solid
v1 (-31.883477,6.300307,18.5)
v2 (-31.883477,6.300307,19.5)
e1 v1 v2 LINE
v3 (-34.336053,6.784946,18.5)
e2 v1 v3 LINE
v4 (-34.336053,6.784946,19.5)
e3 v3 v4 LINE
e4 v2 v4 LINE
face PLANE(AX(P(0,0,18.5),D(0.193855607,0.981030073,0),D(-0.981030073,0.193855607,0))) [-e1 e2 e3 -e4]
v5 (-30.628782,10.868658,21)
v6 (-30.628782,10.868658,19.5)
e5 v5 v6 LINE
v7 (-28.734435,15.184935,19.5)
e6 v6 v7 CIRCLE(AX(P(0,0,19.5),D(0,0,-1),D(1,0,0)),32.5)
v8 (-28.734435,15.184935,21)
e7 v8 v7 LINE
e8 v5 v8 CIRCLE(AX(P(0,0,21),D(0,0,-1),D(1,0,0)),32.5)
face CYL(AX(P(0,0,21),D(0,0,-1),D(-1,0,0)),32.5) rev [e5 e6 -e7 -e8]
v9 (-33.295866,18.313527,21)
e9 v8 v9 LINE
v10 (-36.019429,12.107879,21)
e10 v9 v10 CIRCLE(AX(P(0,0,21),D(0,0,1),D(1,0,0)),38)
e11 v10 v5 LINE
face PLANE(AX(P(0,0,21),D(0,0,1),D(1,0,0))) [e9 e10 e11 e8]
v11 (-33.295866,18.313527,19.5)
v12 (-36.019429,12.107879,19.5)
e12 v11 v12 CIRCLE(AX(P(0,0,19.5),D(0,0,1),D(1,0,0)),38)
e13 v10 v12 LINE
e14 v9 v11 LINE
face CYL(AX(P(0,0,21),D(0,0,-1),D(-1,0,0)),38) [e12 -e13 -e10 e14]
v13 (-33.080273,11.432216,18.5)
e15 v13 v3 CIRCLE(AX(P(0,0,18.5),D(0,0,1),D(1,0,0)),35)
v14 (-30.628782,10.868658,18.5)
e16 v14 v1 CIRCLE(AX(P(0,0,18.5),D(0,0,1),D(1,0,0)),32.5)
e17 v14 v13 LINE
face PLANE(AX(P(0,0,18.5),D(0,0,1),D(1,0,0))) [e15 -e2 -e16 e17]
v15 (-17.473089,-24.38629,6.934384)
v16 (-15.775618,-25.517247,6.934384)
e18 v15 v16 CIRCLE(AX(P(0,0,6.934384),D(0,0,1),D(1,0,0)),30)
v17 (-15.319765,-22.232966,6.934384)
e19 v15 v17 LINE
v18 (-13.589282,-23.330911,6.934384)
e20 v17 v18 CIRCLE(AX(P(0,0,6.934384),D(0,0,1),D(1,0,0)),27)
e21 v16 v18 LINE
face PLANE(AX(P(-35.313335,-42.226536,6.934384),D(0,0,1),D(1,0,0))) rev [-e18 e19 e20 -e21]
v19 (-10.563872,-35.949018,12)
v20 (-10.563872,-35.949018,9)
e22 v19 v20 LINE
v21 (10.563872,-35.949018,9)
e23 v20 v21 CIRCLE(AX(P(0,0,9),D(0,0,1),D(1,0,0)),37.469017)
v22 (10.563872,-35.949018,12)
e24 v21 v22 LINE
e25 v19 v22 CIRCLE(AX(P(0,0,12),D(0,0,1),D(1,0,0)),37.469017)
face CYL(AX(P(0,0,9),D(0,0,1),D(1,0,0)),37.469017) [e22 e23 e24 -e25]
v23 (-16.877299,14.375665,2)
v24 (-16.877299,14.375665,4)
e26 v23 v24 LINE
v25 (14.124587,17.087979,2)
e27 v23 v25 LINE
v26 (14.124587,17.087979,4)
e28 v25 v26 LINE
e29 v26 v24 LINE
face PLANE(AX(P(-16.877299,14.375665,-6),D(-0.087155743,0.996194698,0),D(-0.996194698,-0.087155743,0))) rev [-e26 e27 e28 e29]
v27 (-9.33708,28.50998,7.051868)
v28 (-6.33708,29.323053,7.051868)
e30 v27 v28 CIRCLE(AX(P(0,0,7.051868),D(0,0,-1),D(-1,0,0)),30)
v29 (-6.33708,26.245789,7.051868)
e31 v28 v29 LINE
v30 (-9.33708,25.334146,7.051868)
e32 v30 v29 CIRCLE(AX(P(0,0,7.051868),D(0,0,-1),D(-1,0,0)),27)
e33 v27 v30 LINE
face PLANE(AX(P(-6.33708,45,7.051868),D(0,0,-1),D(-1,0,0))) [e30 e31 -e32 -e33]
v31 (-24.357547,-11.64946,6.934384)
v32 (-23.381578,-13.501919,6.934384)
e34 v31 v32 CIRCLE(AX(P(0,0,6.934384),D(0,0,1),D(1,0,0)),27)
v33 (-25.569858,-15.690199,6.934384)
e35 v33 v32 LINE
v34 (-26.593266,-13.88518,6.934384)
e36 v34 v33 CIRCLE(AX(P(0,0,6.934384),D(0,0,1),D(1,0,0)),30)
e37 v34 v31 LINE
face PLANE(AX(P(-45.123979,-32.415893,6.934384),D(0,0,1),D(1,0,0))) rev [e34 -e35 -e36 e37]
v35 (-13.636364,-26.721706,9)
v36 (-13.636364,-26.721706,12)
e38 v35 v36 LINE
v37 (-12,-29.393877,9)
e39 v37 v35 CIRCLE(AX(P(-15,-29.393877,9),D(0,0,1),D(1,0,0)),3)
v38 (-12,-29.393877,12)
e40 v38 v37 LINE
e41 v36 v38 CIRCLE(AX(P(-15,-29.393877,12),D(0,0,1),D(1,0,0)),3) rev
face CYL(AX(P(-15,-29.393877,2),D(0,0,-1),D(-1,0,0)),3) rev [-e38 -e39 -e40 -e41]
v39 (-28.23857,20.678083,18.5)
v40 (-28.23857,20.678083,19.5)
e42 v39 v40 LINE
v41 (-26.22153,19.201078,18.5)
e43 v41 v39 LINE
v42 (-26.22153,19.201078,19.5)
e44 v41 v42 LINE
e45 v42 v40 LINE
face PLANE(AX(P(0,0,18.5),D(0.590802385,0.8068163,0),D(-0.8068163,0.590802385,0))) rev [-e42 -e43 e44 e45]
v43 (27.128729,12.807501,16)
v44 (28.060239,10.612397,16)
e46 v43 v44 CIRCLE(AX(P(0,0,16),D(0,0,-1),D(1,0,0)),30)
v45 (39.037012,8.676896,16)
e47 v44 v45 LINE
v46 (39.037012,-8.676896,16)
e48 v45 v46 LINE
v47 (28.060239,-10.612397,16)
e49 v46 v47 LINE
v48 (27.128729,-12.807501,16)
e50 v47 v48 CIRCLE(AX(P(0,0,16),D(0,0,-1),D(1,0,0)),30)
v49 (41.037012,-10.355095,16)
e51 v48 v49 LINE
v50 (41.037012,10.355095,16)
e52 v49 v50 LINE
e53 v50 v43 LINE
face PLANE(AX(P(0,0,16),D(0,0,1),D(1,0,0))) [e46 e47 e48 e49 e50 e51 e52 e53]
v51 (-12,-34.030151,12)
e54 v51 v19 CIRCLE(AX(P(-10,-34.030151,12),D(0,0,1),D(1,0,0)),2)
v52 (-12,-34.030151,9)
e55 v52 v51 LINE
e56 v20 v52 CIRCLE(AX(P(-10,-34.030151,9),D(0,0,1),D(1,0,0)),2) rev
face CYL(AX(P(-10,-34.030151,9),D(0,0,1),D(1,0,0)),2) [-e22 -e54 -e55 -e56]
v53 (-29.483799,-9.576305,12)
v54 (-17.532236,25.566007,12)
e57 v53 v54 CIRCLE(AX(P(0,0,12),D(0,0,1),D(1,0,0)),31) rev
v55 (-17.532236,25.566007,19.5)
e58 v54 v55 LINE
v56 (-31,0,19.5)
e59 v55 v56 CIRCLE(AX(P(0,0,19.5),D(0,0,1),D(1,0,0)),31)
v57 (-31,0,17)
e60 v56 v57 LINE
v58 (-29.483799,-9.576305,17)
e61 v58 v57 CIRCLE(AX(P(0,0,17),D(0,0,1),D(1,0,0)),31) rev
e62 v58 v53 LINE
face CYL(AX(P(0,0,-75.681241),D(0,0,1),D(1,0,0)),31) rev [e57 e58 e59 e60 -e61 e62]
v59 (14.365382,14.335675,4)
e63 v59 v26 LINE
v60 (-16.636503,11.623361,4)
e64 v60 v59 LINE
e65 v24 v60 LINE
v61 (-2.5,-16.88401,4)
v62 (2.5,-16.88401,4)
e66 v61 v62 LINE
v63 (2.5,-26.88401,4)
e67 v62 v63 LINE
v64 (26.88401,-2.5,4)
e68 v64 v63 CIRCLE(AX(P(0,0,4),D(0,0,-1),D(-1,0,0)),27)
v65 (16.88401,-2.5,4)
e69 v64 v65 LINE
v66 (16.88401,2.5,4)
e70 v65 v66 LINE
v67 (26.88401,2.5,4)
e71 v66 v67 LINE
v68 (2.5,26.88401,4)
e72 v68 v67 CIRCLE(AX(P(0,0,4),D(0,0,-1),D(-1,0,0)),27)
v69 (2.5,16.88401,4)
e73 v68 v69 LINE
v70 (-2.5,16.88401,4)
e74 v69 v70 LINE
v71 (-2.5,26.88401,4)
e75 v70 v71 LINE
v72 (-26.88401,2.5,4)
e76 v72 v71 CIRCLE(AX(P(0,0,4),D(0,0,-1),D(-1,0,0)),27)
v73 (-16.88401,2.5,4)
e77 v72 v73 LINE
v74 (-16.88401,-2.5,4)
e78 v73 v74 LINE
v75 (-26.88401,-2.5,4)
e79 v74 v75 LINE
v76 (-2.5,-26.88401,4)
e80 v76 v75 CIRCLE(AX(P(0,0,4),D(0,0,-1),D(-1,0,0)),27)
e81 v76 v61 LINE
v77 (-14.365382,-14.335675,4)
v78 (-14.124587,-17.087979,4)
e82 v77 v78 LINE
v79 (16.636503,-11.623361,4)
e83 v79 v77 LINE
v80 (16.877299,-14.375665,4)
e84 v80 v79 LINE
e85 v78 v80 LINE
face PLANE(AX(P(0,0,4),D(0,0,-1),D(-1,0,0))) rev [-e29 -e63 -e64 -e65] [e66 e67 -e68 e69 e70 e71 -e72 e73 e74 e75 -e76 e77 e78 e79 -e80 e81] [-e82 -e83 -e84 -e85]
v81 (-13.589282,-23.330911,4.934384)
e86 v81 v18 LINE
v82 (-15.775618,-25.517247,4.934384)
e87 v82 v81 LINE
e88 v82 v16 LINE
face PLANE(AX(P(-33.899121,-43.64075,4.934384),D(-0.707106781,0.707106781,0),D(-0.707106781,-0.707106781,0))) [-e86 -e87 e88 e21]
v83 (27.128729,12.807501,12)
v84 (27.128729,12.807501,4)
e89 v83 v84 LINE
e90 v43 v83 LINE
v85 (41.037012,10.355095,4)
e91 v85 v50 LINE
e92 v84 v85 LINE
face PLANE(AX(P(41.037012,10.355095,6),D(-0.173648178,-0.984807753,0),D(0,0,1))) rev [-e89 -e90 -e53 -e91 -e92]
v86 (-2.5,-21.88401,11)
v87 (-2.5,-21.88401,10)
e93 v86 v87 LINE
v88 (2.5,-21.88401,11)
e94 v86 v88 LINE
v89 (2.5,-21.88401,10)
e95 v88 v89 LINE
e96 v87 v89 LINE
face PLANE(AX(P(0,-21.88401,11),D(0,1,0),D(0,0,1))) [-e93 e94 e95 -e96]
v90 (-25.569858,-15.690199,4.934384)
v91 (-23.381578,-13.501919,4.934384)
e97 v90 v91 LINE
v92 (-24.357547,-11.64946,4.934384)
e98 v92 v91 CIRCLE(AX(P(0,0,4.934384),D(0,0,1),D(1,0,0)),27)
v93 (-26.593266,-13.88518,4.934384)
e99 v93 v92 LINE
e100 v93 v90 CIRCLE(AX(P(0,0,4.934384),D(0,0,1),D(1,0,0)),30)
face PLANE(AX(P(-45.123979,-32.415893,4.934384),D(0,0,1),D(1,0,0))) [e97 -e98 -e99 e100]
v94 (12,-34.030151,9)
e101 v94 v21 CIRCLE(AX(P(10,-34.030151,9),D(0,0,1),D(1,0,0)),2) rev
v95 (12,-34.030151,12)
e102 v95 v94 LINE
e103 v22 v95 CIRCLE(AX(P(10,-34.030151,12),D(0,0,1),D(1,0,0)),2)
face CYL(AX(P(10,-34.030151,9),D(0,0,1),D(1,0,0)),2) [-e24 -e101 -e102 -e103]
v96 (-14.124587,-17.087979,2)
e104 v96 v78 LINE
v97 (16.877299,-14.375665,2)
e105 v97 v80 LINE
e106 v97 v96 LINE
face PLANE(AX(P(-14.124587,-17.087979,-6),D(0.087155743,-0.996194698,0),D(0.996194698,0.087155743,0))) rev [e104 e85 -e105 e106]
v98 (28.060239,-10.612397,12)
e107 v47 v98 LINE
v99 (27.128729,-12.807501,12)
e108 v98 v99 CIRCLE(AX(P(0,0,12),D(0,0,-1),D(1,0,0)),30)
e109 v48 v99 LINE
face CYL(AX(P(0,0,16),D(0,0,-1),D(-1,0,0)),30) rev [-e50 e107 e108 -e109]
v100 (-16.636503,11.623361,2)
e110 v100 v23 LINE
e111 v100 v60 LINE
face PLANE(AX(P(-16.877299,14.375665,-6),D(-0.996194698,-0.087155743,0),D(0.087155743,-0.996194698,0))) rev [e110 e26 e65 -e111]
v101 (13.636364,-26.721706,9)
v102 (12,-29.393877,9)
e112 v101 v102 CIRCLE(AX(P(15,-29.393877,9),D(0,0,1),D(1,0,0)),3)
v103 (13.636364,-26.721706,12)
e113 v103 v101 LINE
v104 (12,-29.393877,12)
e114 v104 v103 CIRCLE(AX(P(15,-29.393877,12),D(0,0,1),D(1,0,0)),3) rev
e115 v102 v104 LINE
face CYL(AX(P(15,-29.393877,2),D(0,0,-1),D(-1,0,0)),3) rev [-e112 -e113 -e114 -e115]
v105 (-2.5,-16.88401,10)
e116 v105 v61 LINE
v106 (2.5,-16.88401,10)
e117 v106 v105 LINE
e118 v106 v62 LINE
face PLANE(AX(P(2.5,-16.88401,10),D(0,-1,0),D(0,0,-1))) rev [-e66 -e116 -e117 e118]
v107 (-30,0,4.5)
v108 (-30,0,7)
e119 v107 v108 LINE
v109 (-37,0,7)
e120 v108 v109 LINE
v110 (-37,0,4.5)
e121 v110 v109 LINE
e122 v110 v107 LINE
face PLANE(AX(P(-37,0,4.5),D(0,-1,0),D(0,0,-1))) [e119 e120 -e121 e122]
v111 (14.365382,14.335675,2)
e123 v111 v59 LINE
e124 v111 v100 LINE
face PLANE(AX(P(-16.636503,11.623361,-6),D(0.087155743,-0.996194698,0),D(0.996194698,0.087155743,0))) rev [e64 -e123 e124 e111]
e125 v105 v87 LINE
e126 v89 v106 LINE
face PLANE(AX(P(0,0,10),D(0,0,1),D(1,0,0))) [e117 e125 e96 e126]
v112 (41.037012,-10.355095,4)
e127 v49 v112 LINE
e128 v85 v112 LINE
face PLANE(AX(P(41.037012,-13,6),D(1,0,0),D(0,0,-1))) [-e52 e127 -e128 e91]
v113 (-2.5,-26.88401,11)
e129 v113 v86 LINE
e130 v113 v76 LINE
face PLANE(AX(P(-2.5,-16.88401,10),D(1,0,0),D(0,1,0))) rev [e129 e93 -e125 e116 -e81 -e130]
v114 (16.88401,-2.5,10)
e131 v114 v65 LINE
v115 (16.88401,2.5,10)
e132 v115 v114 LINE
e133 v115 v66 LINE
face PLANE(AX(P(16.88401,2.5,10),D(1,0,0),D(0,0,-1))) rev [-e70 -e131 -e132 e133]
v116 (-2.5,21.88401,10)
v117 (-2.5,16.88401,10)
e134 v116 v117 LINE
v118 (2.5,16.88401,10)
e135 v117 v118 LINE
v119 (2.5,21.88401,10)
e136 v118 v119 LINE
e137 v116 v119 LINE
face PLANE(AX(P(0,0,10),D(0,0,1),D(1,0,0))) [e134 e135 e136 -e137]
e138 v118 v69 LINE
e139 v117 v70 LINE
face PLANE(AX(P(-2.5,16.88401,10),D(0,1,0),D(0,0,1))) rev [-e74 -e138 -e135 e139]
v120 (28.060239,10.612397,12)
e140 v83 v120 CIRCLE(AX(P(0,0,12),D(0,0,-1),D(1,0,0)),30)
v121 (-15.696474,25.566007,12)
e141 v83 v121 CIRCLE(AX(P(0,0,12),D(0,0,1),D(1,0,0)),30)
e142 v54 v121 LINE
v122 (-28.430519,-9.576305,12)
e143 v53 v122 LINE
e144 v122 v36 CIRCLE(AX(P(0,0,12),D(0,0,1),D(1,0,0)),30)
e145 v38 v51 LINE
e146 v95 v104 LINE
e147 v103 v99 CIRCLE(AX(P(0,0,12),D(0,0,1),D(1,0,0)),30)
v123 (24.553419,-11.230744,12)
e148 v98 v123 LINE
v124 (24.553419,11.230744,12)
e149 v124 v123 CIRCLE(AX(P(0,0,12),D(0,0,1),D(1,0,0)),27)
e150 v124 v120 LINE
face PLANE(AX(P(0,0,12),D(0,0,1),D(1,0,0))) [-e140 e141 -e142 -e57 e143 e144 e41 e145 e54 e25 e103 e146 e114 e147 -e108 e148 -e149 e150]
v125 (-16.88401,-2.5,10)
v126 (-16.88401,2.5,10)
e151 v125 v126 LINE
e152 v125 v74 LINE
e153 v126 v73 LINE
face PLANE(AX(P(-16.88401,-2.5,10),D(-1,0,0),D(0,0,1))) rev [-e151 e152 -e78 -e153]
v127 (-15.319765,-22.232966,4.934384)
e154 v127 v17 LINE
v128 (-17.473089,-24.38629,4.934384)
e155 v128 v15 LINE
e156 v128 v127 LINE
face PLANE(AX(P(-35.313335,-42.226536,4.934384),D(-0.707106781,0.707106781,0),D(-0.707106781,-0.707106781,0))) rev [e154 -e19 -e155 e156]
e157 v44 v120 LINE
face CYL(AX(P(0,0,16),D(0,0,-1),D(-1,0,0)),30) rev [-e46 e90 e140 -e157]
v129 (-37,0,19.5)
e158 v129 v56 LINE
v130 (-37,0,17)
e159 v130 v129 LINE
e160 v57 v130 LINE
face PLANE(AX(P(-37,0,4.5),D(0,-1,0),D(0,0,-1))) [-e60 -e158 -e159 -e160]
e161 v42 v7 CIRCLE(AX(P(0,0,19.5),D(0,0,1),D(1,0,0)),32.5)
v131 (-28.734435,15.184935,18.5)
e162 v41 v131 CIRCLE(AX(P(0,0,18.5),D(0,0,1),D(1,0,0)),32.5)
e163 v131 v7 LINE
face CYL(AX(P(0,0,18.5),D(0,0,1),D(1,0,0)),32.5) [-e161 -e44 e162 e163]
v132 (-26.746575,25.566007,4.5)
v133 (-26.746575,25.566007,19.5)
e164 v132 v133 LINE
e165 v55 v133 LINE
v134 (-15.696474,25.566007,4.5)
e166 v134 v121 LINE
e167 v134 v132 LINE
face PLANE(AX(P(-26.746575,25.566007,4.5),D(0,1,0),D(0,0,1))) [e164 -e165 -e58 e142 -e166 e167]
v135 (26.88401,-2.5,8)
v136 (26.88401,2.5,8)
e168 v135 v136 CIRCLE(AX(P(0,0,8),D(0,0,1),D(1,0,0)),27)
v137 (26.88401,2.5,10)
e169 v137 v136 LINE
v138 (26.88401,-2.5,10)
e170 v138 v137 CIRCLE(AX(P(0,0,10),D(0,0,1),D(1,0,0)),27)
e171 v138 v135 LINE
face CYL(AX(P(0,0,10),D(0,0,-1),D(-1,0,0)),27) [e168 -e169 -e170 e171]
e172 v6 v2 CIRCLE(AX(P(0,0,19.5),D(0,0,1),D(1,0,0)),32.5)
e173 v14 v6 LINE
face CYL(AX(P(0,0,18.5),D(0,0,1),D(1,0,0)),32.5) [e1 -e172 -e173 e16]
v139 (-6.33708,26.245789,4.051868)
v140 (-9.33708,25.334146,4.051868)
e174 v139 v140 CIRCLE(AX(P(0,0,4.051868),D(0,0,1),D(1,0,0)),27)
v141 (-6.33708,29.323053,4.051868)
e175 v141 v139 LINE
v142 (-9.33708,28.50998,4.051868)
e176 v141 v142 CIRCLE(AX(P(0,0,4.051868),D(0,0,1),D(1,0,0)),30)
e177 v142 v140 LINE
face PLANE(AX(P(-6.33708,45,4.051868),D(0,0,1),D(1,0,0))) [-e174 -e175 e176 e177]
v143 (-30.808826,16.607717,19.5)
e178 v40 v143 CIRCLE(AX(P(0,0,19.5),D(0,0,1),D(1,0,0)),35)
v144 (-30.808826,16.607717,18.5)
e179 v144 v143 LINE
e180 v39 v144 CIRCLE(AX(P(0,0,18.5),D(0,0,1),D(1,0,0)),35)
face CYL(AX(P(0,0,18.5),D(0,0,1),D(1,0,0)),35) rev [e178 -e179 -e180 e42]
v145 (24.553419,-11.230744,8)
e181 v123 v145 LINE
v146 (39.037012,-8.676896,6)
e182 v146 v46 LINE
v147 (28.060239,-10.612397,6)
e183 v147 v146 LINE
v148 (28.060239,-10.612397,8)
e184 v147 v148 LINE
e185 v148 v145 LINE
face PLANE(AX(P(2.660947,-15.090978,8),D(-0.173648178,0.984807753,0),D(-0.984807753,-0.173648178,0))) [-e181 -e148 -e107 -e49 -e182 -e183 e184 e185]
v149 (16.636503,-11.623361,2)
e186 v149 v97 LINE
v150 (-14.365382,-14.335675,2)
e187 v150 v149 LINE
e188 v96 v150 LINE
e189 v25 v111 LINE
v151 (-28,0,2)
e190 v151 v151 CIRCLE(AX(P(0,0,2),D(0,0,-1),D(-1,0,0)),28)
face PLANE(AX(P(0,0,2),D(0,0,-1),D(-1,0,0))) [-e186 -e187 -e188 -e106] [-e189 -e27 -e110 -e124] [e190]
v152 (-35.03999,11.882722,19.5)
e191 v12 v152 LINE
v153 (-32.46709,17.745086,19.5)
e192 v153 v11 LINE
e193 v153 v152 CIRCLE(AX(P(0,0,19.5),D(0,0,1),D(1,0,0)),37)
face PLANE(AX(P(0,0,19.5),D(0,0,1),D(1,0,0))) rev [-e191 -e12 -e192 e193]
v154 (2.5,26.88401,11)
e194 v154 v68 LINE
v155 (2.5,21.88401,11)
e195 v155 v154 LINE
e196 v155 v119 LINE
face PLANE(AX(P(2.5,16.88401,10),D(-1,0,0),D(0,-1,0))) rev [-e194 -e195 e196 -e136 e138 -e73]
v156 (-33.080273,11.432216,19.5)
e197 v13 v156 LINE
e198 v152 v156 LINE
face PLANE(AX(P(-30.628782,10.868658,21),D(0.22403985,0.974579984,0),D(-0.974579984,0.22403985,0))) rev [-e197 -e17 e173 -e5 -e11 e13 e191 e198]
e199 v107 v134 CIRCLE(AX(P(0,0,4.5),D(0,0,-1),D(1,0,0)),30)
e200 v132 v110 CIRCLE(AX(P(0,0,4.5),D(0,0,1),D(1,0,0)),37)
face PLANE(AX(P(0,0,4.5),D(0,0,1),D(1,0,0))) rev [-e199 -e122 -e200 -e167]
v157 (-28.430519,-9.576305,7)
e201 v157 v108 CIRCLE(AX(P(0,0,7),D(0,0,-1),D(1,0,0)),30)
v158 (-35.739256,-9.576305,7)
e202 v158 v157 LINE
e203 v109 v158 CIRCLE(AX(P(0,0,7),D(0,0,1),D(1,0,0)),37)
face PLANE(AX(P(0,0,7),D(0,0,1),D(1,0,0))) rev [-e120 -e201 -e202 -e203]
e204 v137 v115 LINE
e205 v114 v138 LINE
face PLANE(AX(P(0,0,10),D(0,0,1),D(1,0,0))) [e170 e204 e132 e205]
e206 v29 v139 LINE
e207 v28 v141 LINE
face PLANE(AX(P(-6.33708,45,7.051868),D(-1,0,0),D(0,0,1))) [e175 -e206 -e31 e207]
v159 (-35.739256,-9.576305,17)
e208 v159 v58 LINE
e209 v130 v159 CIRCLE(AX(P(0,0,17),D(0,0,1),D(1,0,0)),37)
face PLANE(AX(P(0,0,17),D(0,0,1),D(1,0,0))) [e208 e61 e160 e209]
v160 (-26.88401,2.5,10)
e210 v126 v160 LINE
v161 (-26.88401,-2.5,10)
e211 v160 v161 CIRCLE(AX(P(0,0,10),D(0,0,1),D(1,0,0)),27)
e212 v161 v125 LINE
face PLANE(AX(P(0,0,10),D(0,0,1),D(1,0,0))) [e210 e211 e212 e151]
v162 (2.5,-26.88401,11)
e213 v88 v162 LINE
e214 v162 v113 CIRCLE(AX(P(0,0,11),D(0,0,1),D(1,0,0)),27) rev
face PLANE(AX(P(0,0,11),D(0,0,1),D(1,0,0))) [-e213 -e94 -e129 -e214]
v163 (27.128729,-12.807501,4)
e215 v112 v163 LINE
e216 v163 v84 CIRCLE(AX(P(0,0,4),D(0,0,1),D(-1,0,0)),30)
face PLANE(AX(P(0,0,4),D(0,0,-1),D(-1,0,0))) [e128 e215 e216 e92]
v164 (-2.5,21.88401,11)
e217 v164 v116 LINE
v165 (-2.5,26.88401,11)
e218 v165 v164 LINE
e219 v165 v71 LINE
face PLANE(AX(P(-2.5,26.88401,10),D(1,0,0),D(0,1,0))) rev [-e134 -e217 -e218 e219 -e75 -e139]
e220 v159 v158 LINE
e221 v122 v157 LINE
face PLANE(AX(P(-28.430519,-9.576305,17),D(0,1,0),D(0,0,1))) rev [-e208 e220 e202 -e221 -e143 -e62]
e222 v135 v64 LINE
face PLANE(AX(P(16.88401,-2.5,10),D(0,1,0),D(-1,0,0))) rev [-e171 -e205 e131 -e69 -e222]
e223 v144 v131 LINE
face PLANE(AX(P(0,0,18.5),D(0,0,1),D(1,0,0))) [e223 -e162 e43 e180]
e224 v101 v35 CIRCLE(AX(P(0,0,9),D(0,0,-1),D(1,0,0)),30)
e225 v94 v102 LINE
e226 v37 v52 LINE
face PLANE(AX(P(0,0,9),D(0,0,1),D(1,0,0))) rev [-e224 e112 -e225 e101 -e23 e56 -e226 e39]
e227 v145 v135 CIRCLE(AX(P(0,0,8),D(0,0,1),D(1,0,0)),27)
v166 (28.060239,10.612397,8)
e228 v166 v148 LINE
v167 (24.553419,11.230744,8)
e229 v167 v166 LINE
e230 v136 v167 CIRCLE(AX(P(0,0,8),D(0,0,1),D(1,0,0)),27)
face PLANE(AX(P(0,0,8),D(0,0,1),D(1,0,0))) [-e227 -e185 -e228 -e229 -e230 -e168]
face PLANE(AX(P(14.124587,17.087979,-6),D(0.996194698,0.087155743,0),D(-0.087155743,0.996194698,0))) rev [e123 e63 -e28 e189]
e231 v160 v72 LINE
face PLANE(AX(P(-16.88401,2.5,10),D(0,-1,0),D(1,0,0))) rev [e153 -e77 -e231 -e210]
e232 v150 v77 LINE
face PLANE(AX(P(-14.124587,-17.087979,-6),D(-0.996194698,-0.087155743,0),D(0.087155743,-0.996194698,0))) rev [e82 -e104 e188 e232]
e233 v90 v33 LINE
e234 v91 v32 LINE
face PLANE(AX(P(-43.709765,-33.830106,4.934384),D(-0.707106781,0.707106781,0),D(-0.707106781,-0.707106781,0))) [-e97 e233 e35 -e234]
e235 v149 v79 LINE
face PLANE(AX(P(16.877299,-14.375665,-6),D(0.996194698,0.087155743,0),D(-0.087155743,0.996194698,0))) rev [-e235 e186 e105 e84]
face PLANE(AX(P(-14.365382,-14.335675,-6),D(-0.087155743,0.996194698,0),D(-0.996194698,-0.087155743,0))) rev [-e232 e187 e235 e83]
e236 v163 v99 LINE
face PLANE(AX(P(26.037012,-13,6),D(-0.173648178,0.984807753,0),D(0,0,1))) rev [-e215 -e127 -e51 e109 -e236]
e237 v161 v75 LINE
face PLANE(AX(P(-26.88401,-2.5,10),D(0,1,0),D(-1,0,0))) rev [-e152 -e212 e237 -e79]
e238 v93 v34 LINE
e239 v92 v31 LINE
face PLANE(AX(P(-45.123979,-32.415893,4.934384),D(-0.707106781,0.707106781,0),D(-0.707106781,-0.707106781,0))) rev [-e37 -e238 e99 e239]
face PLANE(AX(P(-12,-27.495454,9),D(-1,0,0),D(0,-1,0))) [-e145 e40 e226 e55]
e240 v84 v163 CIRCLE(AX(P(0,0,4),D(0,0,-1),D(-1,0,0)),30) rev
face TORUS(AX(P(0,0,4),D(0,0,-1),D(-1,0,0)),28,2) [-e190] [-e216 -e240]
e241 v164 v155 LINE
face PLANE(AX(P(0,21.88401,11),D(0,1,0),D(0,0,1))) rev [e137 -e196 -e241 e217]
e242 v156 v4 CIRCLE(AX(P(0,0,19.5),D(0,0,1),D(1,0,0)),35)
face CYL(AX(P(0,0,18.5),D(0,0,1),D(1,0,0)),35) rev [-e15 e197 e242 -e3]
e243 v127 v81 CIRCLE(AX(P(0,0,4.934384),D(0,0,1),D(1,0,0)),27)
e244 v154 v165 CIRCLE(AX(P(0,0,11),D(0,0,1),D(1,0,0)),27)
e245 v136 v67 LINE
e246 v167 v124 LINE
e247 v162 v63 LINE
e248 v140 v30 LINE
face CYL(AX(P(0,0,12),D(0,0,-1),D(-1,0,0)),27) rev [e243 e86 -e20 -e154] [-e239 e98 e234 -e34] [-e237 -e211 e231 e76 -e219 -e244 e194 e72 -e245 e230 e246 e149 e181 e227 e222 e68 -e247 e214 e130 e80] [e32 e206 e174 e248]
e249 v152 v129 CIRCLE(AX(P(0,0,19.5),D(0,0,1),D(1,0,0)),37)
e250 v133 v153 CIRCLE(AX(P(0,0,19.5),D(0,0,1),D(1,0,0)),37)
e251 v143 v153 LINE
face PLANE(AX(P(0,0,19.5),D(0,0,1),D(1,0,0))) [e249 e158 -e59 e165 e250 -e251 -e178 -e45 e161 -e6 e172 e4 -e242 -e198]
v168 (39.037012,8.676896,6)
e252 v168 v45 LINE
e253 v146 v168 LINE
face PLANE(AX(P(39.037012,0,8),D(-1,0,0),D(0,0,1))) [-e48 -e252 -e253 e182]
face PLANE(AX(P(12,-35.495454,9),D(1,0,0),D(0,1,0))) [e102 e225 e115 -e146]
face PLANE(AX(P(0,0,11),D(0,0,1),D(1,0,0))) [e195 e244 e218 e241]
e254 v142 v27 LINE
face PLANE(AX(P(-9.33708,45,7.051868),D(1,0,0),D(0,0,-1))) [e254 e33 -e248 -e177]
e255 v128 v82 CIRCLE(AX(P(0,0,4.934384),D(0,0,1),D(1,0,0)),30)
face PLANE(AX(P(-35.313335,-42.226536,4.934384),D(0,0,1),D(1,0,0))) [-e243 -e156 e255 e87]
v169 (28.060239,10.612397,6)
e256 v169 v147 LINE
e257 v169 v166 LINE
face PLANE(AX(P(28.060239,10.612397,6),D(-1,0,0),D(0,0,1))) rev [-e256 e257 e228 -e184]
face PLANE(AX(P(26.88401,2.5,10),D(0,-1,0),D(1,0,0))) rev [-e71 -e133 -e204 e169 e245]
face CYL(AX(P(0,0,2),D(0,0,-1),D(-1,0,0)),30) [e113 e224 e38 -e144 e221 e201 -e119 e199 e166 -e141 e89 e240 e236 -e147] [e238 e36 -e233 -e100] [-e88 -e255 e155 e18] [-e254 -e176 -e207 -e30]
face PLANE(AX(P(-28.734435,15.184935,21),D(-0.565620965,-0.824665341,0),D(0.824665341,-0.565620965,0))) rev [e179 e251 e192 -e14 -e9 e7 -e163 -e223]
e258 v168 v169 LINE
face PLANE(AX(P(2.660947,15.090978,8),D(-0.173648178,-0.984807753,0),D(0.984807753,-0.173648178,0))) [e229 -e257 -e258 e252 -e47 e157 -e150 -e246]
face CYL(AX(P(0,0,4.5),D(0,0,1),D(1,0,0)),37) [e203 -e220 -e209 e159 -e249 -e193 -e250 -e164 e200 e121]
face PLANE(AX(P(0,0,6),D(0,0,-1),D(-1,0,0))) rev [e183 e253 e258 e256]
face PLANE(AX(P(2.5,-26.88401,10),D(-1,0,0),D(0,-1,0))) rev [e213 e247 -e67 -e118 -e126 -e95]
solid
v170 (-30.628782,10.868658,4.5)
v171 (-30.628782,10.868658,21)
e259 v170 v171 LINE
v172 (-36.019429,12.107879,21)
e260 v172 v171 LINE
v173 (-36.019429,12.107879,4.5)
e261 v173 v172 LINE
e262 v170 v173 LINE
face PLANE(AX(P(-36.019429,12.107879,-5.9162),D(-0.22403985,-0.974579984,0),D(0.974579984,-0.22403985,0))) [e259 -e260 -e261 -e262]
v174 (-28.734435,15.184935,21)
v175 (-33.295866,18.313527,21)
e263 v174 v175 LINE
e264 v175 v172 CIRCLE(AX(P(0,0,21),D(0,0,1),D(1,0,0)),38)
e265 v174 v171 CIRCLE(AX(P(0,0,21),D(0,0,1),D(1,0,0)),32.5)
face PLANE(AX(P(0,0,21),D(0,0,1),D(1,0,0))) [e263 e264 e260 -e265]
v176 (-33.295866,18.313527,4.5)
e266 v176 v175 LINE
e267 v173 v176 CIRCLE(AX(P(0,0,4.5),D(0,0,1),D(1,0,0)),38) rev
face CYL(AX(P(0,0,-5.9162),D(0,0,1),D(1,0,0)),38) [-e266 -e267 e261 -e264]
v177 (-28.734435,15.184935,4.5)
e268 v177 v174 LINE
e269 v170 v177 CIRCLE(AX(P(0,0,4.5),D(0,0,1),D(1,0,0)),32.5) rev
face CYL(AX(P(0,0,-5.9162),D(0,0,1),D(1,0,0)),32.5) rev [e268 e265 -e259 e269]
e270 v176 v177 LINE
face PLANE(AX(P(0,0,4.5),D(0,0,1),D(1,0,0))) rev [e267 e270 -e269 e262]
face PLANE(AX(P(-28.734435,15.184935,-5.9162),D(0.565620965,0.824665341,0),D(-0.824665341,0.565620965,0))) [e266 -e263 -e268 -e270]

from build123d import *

# Parameters (mm, degrees)
SKETCH_1_R           = 30
EXTRUDE_1_DEPTH      = 2
SKETCH_5_R           = 30
SKETCH_5_R_2         = 27
EXTRUDE_2_DEPTH      = 10
EXTRUDE_START        = -3
EXTRUDE_3_DEPTH      = 3
FILLET_2_R           = 3
FILLET_3_R           = 3
EXTRUDE_START_2      = -6
EXTRUDE_4_DEPTH      = 6
EXTRUDE_6_DEPTH      = 7.5
SKETCH_14_R          = 31
CUT_EXTRUDE_3_DEPTH  = 7.5
CHAMFER_4_SIZE       = 2.644904711
CHAMFER_4_SIZE_2     = 15
CHAMFER_5_SIZE       = 2.644904711
CHAMFER_5_SIZE_2     = 15
CUT_EXTRUDE_START    = -4
CUT_EXTRUDE_6_DEPTH  = 4
EXTRUDE_10_DEPTH     = 5
CUT_EXTRUDE_START_2  = 6
CUT_EXTRUDE_7_DEPTH  = 6
EXTRUDE_11_DEPTH     = 8
EXTRUDE_12_DEPTH     = 1
EXTRUDE_13_DEPTH     = 1.5
EXTRUDE_14_DEPTH     = 16.5
CUT_EXTRUDE_START_3  = -1
CUT_EXTRUDE_8_DEPTH  = 1
EXTRUDE_START_3      = 2
EXTRUDE_15_DEPTH     = 2
CUT_EXTRUDE_9_DEPTH  = 2
SKETCH_33_R          = 30
CUT_EXTRUDE_10_DEPTH = 2
SKETCH_34_R          = 30
EXTRUDE_16_DEPTH     = 2
FILLET_4_R           = 2
FILLET_5_R           = 2
CUT_EXTRUDE_11_DEPTH = 10
FILLET_6_R           = 2
SKETCH_37_W          = 2
SKETCH_37_H          = 2
CUT_EXTRUDE_12_DEPTH = 65
SKETCH_38_W          = 3
SKETCH_38_H          = 3
CUT_EXTRUDE_14_DEPTH = 45
EXTRUDE_17_DEPTH     = 4


# Some blends are built 0.0001 mm under size
with BuildPart() as part:
    # 草图1 → 凸台-拉伸1 (new body)
    with BuildSketch(Plane.XY):
        Circle(SKETCH_1_R)
    extrude(amount=EXTRUDE_1_DEPTH)

    # 草图5 → 凸台-拉伸2 (add)
    with BuildSketch(Plane.XY.offset(2)):
        Circle(SKETCH_5_R)
        Circle(SKETCH_5_R_2, mode=Mode.SUBTRACT)
    extrude(amount=EXTRUDE_2_DEPTH)

    # 草图6 → 凸台-拉伸3 (add)
    with BuildSketch(Plane.XY.offset(12).offset(EXTRUDE_START)):
        with BuildLine():
            Line((-12, -27.49545417), (-12, -35.49545417))
            ThreePointArc((-12, -35.49545417), (0, -37.469017424), (12, -35.49545417))
            Line((12, -35.49545417), (12, -27.49545417))
            ThreePointArc((12, -27.49545417), (0, -30), (-12, -27.49545417))
        make_face()
    extrude(amount=EXTRUDE_3_DEPTH)

    # 圆角2
    fillet_2_edges = [part.edges().sort_by_distance(p)[0] for p in [
        (-12, -27.49545417, 10.5),
    ]]
    fillet(fillet_2_edges, radius=FILLET_2_R)

    # 圆角3
    fillet_3_edges = [part.edges().sort_by_distance(p)[0] for p in [
        (12, -27.49545417, 10.5),
    ]]
    fillet(fillet_3_edges, radius=FILLET_3_R)

    # 草图8 → 凸台-拉伸4 (add)
    with BuildSketch(Plane.XY.offset(12).offset(EXTRUDE_START_2)):
        with BuildLine():
            Line((27.037011669, -13), (41.037011669, -13))
            Line((41.037011669, -13), (41.037011669, 13))
            Line((41.037011669, 13), (27.037011669, 13))
            ThreePointArc((27.037011669, 13), (30, 0), (27.037011669, -13))
        make_face()
    extrude(amount=EXTRUDE_4_DEPTH)

    # 草图13 → 凸台-拉伸6 (add, symmetric)
    with BuildSketch(Plane.XY.offset(12)):
        with BuildLine():
            Line((-26.746575291, 25.566006927), (-15.696473801, 25.566006927))
            ThreePointArc((-15.696473801, 25.566006927), (-26.181044804, 14.647624141), (-30, 0))
            Line((-30, 0), (-37, 0))
            ThreePointArc((-37, 0), (-34.341107188, 13.772739637), (-26.746575291, 25.566006927))
        make_face()
    extrude(amount=EXTRUDE_6_DEPTH, both=True)

    # 草图14 → 切除-拉伸3 (cut)
    with BuildSketch(Plane.XY.offset(19.5)):
        Circle(SKETCH_14_R)
    extrude(amount=-CUT_EXTRUDE_3_DEPTH, mode=Mode.SUBTRACT)

    # 倒角4
    # the kernel refuses this chamfer: 15, 2.644904711 mm, written as the material it takes off along each edge
    with BuildSketch(Plane(origin=(41.037011669, 13, -32.978081946), x_dir=(0.21013876076743002, -0.9776715712462589, 0), z_dir=(0, 0, 1))) as chamfer_4_piece_1_section:
        Polygon((CHAMFER_4_SIZE * 0.977671571108, -CHAMFER_4_SIZE * 0.210138760738), (-CHAMFER_4_SIZE_2 * 0.210138760767, -CHAMFER_4_SIZE_2 * 0.977671571246), (0, 0), align=None)
    chamfer_4_piece_1 = extrude(amount=83.956163893, mode=Mode.PRIVATE)
    chamfer_4_piece_1 = chamfer_4_piece_1 - Plane(origin=(0, 0, 9), x_dir=(1, 0, 0), z_dir=(0, 0, -1)) * Cylinder(30, 227, mode=Mode.PRIVATE)
    add(chamfer_4_piece_1, mode=Mode.SUBTRACT)

    # 倒角5
    # the kernel refuses this chamfer: 15, 2.644904711 mm, written as the material it takes off along each edge
    with BuildSketch(Plane(origin=(41.037011669, -13, -32.978081946), x_dir=(0.21013876076743015, 0.9776715712462588, 0), z_dir=(0, 0, 1))) as chamfer_5_piece_1_section:
        Polygon((CHAMFER_5_SIZE * 0.977671571108, CHAMFER_5_SIZE * 0.210138760738), (-CHAMFER_5_SIZE_2 * 0.210138760767, CHAMFER_5_SIZE_2 * 0.977671571246), (0, 0), align=None)
    chamfer_5_piece_1 = extrude(amount=83.956163893, mode=Mode.PRIVATE)
    chamfer_5_piece_1 = chamfer_5_piece_1 - Plane(origin=(0, 0, 9), x_dir=(1, 0, 0), z_dir=(0, 0, -1)) * Cylinder(30, 227, mode=Mode.PRIVATE)
    add(chamfer_5_piece_1, mode=Mode.SUBTRACT)

    # 草图16 → 切除-拉伸6 (cut)
    with BuildSketch(Plane.XY.offset(12).offset(CUT_EXTRUDE_START)):
        with BuildLine():
            ThreePointArc((27, 0), (26.381265258, 5.747072595), (24.553419007, 11.230744191))
            Line((24.553419007, 11.230744191), (18.452318659, 12.306532794))
            Line((18.452318659, 12.306532794), (21.994315515, -11.681983183))
            Line((21.994315515, -11.681983183), (24.553419007, -11.230744191))
            ThreePointArc((24.553419007, -11.230744191), (26.381265258, -5.747072595), (27, 0))
        make_face()
        with BuildLine():
            Line((18.452318659, 12.306532794), (24.553419007, 11.230744191))
            ThreePointArc((24.553419007, 11.230744191), (-27, 0), (24.553419007, -11.230744191))
            Line((24.553419007, -11.230744191), (21.994315515, -11.681983183))
            Line((21.994315515, -11.681983183), (18.452318659, 12.306532794))
        make_face()
        with BuildLine():
            Line((39.037011669, 8.676896027), (27.995789134, 10.62376146))
            Line((27.995789134, 10.62376146), (24.553419007, 11.230744191))
            ThreePointArc((24.553419007, 11.230744191), (26.381265258, 5.747072595), (27, 0))
            ThreePointArc((27, 0), (26.381265258, -5.747072595), (24.553419007, -11.230744191))
            Line((24.553419007, -11.230744191), (39.037011669, -8.676896027))
            Line((39.037011669, -8.676896027), (39.037011669, 8.676896027))
        make_face()
    extrude(amount=CUT_EXTRUDE_6_DEPTH, mode=Mode.SUBTRACT)

    # 草图17 → 凸台-拉伸10 (add, symmetric)
    with BuildSketch(Plane.XY.offset(12)):
        with BuildLine():
            Line((-28.430518618, -9.576304669), (-35.739255573, -9.576304669))
            ThreePointArc((-35.739255573, -9.576304669), (-36.683459871, -4.829469112), (-37, 0))
            Line((-37, 0), (-31, 0))
            Line((-31, 0), (-30, 0))
            ThreePointArc((-30, 0), (-29.605029628, -4.852032639), (-28.430518618, -9.576304669))
        make_face()
    extrude(amount=EXTRUDE_10_DEPTH, both=True)

    # 草图18 → 切除-拉伸7 (cut)
    with BuildSketch(Plane.XY.offset(12).offset(CUT_EXTRUDE_START_2)):
        with BuildLine():
            ThreePointArc((-31, 0), (-30.618603506, -4.847795306), (-29.483798753, -9.576304669))
            Line((-29.483798753, -9.576304669), (-28.430518618, -9.576304669))
            ThreePointArc((-28.430518618, -9.576304669), (-29.605029628, -4.852032639), (-30, 0))
            Line((-30, 0), (-31, 0))
        make_face()
    extrude(amount=-CUT_EXTRUDE_7_DEPTH, mode=Mode.SUBTRACT)

    # 草图19 → 凸台-拉伸11 (add)
    with BuildSketch(Plane.XY.offset(2)):
        with BuildLine():
            Line((-2.5, 26.884010118), (-2.5, 16.884010118))
            Line((-2.5, 16.884010118), (2.5, 16.884010118))
            Line((2.5, 16.884010118), (2.5, 26.884010118))
            ThreePointArc((2.5, 26.884010118), (0, 27), (-2.5, 26.884010118))
        make_face()
        with BuildLine():
            Line((26.884010118, 2.5), (16.884010118, 2.5))
            Line((16.884010118, 2.5), (16.884010118, -2.5))
            Line((16.884010118, -2.5), (26.884010118, -2.5))
            ThreePointArc((26.884010118, -2.5), (27, 0), (26.884010118, 2.5))
        make_face()
        with BuildLine():
            Line((2.5, -26.884010118), (2.5, -16.884010118))
            Line((2.5, -16.884010118), (-2.5, -16.884010118))
            Line((-2.5, -16.884010118), (-2.5, -26.884010118))
            ThreePointArc((-2.5, -26.884010118), (0, -27), (2.5, -26.884010118))
        make_face()
        with BuildLine():
            Line((-26.884010118, -2.5), (-16.884010118, -2.5))
            Line((-16.884010118, -2.5), (-16.884010118, 2.5))
            Line((-16.884010118, 2.5), (-26.884010118, 2.5))
            ThreePointArc((-26.884010118, 2.5), (-27, 0), (-26.884010118, -2.5))
        make_face()
    extrude(amount=EXTRUDE_11_DEPTH)

    # 草图20 → 凸台-拉伸12 (add)
    with BuildSketch(Plane.XY.offset(10)):
        with BuildLine():
            ThreePointArc((2.5, -26.884010118), (0, -27), (-2.5, -26.884010118))
            Line((-2.5, -26.884010118), (-2.5, -21.884010118))
            Line((-2.5, -21.884010118), (2.5, -21.884010118))
            Line((2.5, -21.884010118), (2.5, -26.884010118))
        make_face()
        with BuildLine():
            ThreePointArc((2.5, 26.884010118), (0, 27), (-2.5, 26.884010118))
            Line((-2.5, 26.884010118), (-2.5, 21.884010118))
            Line((-2.5, 21.884010118), (2.5, 21.884010118))
            Line((2.5, 21.884010118), (2.5, 26.884010118))
        make_face()
    extrude(amount=EXTRUDE_12_DEPTH)

    # 草图21 → 凸台-拉伸13 (add)
    with BuildSketch(Plane.XY.offset(19.5)):
        with BuildLine():
            Line((-28.734434843, 15.184935109), (-33.295866493, 18.31352709))
            ThreePointArc((-33.295866493, 18.31352709), (-34.796265088, 15.271540063), (-36.019428995, 12.10787904))
            Line((-36.019428995, 12.10787904), (-30.628781703, 10.868658214))
            ThreePointArc((-30.628781703, 10.868658214), (-29.759963562, 13.061185581), (-28.734434843, 15.184935109))
        make_face()
    extrude(amount=EXTRUDE_13_DEPTH)

    # 草图28 → 切除-拉伸8 (cut)
    with BuildSketch(Plane.XY.offset(19.5).offset(CUT_EXTRUDE_START_3)):
        with BuildLine():
            Line((-34.336052546, 6.784946244), (-31.883477364, 6.300307226))
            ThreePointArc((-31.883477364, 6.300307226), (-31.339481347, 8.60737526), (-30.628781703, 10.868658214))
            Line((-30.628781703, 10.868658214), (-33.080272788, 11.432215546))
            ThreePointArc((-33.080272788, 11.432215546), (-33.788156333, 9.130196691), (-34.336052546, 6.784946244))
        make_face()
        with BuildLine():
            ThreePointArc((-28.734434843, 15.184935109), (-27.551258788, 17.238855508), (-26.22152974, 19.201077524))
            Line((-26.22152974, 19.201077524), (-28.23857049, 20.678083487))
            ThreePointArc((-28.23857049, 20.678083487), (-29.593761465, 18.687142166), (-30.80882562, 16.607717))
            Line((-30.80882562, 16.607717), (-28.734434843, 15.184935109))
        make_face()
    extrude(amount=CUT_EXTRUDE_8_DEPTH, mode=Mode.SUBTRACT)

    # 草图31 → 凸台-拉伸15 (add)
    with BuildSketch(Plane(origin=(0, 0, 6), x_dir=(-1, 0, 0), z_dir=(0, 0, -1)).offset(EXTRUDE_START_3)):
        with BuildLine():
            Line((-41.037011669, 10.355095289), (-41.037011669, -10.355095289))
            Line((-41.037011669, -10.355095289), (-27.128728731, -12.807500827))
            ThreePointArc((-27.128728731, -12.807500827), (-30, 0), (-27.128728731, 12.807500827))
            Line((-27.128728731, 12.807500827), (-41.037011669, 10.355095289))
        make_face()
    extrude(amount=-EXTRUDE_15_DEPTH)

    # 草图32 → 切除-拉伸9 (cut)
    with BuildSketch(Plane.XY.offset(8)):
        Polygon((39.037011669, -8.676896027), (28.060239243, -10.612397167), (28.060239243, 10.612397167), (39.037011669, 8.676896027), align=None)
    extrude(amount=-CUT_EXTRUDE_9_DEPTH, mode=Mode.SUBTRACT)

    # 草图33 → 切除-拉伸10 (cut)
    with BuildSketch(Plane(origin=(0, 0, 0), x_dir=(-1, 0, 0), z_dir=(0, 0, -1))):
        Circle(SKETCH_33_R)
    extrude(amount=-CUT_EXTRUDE_10_DEPTH, mode=Mode.SUBTRACT)

    # 草图34 → 凸台-拉伸16 (add)
    with BuildSketch(Plane(origin=(0, 0, 2), x_dir=(-1, 0, 0), z_dir=(0, 0, -1))):
        Circle(SKETCH_34_R)
    extrude(amount=-EXTRUDE_16_DEPTH)

    # 圆角4
    fillet_4_edges = [part.edges().sort_by_distance(p)[0] for p in [
        (-12, -35.49545417, 10.5),
    ]]
    fillet(fillet_4_edges, radius=FILLET_4_R)

    # 圆角5
    fillet_5_edges = [part.edges().sort_by_distance(p)[0] for p in [
        (12, -35.49545417, 10.5),
    ]]
    fillet(fillet_5_edges, radius=FILLET_5_R)

    # 草图35 → 切除-拉伸11 (cut)
    with BuildSketch(Plane.XY.offset(4)):
        Polygon((-16.877298883, 14.375665163), (14.124586731, 17.087978702), (14.365382137, 14.33567462), (-16.636503477, 11.623361081), align=None)
        Polygon((16.877298883, -14.375665163), (16.636503477, -11.623361081), (-14.365382137, -14.33567462), (-14.124586731, -17.087978702), align=None)
    extrude(amount=-CUT_EXTRUDE_11_DEPTH, mode=Mode.SUBTRACT)

    # 圆角6
    fillet_6_edges = [part.edges().sort_by_distance(p)[0] for p in [
        (-30, 0, 2),
    ]]
    fillet(fillet_6_edges, radius=FILLET_6_R - 0.0001)  # a hair under: the kernel refuses the full size

    # 草图37 → 切除-拉伸12 (cut)
    with BuildSketch(Plane(origin=(7.192005059, 7.192005059, 0), x_dir=(0, 0, 1), z_dir=(-0.7071067811865475, -0.7071067811865476, 0))):
        with Locations((5.93438389, 7.985973932)):
            Rectangle(SKETCH_37_W, SKETCH_37_H)
        with Locations((5.93438389, -5.888371601)):
            Rectangle(SKETCH_37_W, SKETCH_37_H)
    extrude(amount=CUT_EXTRUDE_12_DEPTH, mode=Mode.SUBTRACT)

    # 草图38 → 切除-拉伸14 (cut)
    with BuildSketch(Plane(origin=(0, 0, 0), x_dir=(1, 0, 0), z_dir=(0, 1, 0))):
        with Locations((-7.837080141, -5.551868465)):
            Rectangle(SKETCH_38_W, SKETCH_38_H)
    extrude(amount=CUT_EXTRUDE_14_DEPTH, mode=Mode.SUBTRACT)

    # 草图40 → 凸台-拉伸17 (add)
    with BuildSketch(Plane.XY.offset(12)):
        with BuildLine():
            Line((27.128728731, -12.807500827), (41.037011669, -10.355095289))
            Line((41.037011669, -10.355095289), (41.037011669, 10.355095289))
            Line((41.037011669, 10.355095289), (27.128728731, 12.807500827))
            ThreePointArc((27.128728731, 12.807500827), (27.61630255, 11.719207886), (28.060239243, 10.612397167))
            Line((28.060239243, 10.612397167), (39.037011669, 8.676896027))
            Line((39.037011669, 8.676896027), (39.037011669, -8.676896027))
            Line((39.037011669, -8.676896027), (28.060239243, -10.612397167))
            ThreePointArc((28.060239243, -10.612397167), (27.61630255, -11.719207886), (27.128728731, -12.807500827))
        make_face()
    extrude(amount=EXTRUDE_17_DEPTH)


with BuildPart() as body_2:
    # 草图26 → 凸台-拉伸14 (new body)
    with BuildSketch(Plane.XY.offset(21)):
        with BuildLine():
            Line((-28.734434843, 15.184935109), (-33.295866493, 18.31352709))
            ThreePointArc((-33.295866493, 18.31352709), (-34.796265088, 15.271540063), (-36.019428995, 12.10787904))
            Line((-36.019428995, 12.10787904), (-30.628781703, 10.868658214))
            ThreePointArc((-30.628781703, 10.868658214), (-29.759963562, 13.061185581), (-28.734434843, 15.184935109))
        make_face()
    extrude(amount=-EXTRUDE_14_DEPTH)


solid = Compound([part.part, body_2.part])
